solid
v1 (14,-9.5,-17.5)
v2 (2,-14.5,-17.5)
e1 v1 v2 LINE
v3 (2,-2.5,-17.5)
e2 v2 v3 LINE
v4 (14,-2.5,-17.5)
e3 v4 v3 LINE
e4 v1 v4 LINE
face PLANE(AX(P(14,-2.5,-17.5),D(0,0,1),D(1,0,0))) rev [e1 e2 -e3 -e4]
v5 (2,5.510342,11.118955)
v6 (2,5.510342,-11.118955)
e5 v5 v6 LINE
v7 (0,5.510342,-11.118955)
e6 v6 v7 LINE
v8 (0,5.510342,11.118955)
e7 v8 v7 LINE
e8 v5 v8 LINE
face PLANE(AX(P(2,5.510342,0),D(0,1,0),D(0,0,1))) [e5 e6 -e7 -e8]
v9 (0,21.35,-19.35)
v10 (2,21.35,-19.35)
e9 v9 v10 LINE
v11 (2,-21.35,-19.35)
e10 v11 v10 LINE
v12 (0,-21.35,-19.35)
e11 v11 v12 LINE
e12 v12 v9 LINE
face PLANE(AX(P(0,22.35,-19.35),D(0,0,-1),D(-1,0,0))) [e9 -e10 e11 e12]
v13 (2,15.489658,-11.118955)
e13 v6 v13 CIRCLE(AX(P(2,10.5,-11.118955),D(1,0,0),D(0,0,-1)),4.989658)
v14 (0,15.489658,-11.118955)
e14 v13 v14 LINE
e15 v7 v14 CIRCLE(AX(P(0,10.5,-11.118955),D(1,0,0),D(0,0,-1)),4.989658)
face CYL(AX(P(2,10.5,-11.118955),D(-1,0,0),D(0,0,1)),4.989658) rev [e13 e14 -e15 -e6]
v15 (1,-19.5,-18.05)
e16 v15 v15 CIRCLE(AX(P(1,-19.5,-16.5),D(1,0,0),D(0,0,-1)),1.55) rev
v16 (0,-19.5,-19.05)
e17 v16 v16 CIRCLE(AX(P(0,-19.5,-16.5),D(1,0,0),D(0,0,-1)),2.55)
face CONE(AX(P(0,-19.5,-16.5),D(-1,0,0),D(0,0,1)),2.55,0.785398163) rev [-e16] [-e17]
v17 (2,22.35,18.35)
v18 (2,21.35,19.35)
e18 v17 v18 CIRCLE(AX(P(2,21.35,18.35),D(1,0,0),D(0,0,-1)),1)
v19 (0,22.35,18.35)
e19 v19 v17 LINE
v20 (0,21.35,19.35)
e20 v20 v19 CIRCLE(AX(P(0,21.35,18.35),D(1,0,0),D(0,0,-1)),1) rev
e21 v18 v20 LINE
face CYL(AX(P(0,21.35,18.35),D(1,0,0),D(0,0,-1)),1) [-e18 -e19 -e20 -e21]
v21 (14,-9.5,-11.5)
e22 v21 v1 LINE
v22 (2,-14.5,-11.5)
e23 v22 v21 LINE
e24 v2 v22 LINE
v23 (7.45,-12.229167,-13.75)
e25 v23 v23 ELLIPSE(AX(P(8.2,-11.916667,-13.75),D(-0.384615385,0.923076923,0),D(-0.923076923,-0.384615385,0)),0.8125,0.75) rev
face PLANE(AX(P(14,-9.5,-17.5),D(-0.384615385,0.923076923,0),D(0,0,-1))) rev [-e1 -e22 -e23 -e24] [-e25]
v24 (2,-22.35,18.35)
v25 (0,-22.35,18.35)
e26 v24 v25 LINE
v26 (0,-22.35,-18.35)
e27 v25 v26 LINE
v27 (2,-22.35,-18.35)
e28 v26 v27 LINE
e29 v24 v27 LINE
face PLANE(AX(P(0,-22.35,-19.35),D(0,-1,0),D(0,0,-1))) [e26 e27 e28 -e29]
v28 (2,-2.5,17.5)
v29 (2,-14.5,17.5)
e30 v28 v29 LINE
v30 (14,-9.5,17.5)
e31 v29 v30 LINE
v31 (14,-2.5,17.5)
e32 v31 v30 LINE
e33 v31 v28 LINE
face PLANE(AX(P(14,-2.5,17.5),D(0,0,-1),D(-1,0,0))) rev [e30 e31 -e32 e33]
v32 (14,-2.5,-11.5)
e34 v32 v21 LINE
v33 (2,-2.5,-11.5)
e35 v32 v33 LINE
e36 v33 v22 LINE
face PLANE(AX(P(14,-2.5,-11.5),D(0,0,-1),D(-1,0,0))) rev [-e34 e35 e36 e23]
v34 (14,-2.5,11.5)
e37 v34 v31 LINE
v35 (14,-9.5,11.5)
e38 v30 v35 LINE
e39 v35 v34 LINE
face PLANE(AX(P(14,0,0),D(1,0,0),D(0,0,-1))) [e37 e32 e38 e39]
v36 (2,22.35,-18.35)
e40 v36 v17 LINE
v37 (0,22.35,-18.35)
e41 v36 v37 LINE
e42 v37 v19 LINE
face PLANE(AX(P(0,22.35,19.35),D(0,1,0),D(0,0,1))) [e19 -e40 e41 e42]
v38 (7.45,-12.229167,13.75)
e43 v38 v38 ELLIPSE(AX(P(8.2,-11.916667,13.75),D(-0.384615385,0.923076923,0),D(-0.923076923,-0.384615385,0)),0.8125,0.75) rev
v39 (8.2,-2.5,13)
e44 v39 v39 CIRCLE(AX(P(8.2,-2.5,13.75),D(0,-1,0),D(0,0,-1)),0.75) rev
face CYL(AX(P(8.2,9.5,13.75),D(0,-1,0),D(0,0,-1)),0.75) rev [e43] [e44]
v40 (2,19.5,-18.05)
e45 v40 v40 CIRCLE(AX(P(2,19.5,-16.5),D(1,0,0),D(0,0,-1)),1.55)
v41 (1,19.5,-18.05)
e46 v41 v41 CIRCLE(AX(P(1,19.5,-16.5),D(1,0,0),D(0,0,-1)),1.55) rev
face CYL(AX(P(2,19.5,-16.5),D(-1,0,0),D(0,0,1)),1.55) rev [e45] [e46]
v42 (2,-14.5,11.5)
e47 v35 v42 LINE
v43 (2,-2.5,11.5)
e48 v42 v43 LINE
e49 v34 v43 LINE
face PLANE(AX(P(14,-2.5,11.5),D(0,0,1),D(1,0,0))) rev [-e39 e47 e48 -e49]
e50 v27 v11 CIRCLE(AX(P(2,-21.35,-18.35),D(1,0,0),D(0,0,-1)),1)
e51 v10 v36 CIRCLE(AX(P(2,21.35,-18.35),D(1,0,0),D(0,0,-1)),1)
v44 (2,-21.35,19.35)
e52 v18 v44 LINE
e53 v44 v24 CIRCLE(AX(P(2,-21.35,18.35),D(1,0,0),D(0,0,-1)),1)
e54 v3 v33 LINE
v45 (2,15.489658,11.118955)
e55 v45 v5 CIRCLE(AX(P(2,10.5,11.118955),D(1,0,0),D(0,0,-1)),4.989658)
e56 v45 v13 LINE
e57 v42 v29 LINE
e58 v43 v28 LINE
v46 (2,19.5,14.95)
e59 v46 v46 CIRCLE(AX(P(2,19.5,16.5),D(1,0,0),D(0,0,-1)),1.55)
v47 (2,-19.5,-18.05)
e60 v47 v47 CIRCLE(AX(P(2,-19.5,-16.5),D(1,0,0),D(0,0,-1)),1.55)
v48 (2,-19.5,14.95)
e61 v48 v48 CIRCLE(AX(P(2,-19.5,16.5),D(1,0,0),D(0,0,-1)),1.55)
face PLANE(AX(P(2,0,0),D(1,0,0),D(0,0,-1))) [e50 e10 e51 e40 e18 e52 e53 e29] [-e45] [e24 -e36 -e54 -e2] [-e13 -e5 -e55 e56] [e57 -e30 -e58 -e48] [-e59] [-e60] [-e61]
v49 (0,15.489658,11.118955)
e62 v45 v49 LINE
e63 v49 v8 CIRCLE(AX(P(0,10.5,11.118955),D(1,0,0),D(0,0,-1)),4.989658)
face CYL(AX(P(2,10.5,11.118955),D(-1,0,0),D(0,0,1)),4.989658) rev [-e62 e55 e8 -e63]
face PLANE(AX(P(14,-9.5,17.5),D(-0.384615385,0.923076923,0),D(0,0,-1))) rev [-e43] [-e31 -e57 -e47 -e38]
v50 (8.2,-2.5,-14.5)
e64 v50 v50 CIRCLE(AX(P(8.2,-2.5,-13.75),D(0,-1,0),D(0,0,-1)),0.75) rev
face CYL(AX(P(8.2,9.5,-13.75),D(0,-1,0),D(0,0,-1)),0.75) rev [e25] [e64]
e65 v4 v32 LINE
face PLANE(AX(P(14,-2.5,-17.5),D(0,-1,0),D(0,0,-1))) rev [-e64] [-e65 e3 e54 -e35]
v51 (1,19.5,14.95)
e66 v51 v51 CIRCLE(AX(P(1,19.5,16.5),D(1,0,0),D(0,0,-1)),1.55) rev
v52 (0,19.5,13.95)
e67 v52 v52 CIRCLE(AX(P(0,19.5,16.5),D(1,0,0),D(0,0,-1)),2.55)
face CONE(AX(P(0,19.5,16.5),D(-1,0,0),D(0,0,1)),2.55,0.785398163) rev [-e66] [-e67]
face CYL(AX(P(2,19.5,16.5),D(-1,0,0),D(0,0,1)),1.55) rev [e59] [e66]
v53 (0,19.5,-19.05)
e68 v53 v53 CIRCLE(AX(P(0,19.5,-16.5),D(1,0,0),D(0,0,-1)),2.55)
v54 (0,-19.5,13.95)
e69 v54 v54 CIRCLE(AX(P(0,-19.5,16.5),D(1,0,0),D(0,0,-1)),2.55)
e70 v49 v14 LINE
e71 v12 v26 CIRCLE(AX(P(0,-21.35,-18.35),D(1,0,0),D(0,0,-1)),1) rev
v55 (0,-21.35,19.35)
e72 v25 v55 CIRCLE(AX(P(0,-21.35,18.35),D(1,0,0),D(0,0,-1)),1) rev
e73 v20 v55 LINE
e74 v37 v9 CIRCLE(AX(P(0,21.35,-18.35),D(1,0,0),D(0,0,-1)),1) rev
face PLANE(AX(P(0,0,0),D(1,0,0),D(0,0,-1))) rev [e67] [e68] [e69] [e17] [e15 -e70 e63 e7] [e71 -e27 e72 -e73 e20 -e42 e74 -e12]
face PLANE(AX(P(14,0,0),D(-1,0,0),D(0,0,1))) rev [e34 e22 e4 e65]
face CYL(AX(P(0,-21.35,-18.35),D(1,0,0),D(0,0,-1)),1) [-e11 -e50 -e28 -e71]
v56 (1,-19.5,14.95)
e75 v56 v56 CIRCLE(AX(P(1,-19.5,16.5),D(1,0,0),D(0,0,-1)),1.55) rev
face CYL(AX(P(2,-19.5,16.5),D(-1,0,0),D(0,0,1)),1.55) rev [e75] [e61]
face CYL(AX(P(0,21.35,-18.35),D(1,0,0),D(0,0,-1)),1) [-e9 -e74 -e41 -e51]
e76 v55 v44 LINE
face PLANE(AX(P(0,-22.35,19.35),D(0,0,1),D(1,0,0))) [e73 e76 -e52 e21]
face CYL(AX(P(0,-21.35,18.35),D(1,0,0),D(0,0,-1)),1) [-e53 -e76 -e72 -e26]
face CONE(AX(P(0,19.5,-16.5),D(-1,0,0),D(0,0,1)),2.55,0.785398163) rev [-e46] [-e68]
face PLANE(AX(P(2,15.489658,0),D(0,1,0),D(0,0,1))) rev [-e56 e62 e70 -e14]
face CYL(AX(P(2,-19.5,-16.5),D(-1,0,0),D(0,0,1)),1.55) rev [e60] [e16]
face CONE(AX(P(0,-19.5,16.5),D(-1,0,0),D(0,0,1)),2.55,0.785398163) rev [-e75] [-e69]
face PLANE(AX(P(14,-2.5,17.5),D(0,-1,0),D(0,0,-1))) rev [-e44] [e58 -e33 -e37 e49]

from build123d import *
from OCP.BRepFilletAPI import BRepFilletAPI_MakeChamfer

# Parameters (mm, degrees)
SKETCH1_W               = 39
SKETCH1_H               = 45
SKETCH1_R               = 1.55
BOSS_EXTRUDE1_DEPTH     = 2
SKETCH2_W               = 6
SKETCH2_H               = 7
BOSS_EXTRUDE2_DEPTH     = 12
CHAMFER1_SIZE           = 5
CHAMFER1_SIZE_2         = 12
CUT_EXTRUDE1_DEPTH      = 12
CUT_EXTRUDE1_DEPTH_BACK = 22
SKETCH3_R               = 0.75
CUT_EXTRUDE2_DEPTH      = 33.101401839
CUT_EXTRUDE2_DEPTH_BACK = 33.101401839
SKETCH4_W               = 39
SKETCH4_H               = 45
SKETCH4_W_2             = 38.7
SKETCH4_H_2             = 44.7
FILLET1_R               = 1
CHAMFER2_SIZE           = 1


with BuildPart() as part:
    # Sketch1 → Boss-Extrude1 (new body)
    with BuildSketch(Plane(origin=(0, 0, 0), x_dir=(0, 0, -1), z_dir=(1, 0, 0))):
        Rectangle(SKETCH1_W, SKETCH1_H)
        with Locations((-16.5, 19.5)):
            Circle(SKETCH1_R, mode=Mode.SUBTRACT)
        with Locations((16.5, 19.5)):
            Circle(SKETCH1_R, mode=Mode.SUBTRACT)
        with Locations((16.5, -19.5)):
            Circle(SKETCH1_R, mode=Mode.SUBTRACT)
        with Locations((-16.5, -19.5)):
            Circle(SKETCH1_R, mode=Mode.SUBTRACT)
        with BuildLine():
            Line((-11.118955155, 15.489657916), (11.118955155, 15.489657916))
            ThreePointArc((11.118955155, 15.489657916), (16.108613071, 10.5), (11.118955155, 5.510342084))
            Line((11.118955155, 5.510342084), (-11.118955155, 5.510342084))
            ThreePointArc((-11.118955155, 5.510342084), (-16.108613071, 10.5), (-11.118955155, 15.489657916))
        make_face(mode=Mode.SUBTRACT)
    extrude(amount=BOSS_EXTRUDE1_DEPTH)

    # Sketch2 → Boss-Extrude2 (add)
    with BuildSketch(Plane(origin=(2, 0, 0), x_dir=(0, 0, -1), z_dir=(1, 0, 0))):
        with Locations((14.5, -6)):
            Rectangle(SKETCH2_W, SKETCH2_H)
        with Locations((-14.5, -6)):
            Rectangle(SKETCH2_W, SKETCH2_H)
    extrude(amount=BOSS_EXTRUDE2_DEPTH)

    # Chamfer1
    chamfer1_edges_1 = [part.edges().sort_by_distance(p)[0] for p in [
        (2, -9.5, -14.5),
    ]]
    chamfer1_side_1 = [part.faces().sort_by_distance(p)[0] for p in [
        (2, -9.6, -14.5),
    ]]
    chamfer1_edges_2 = [part.edges().sort_by_distance(p)[0] for p in [
        (2, -9.5, 14.5),
    ]]
    chamfer1_side_2 = [part.faces().sort_by_distance(p)[0] for p in [
        (2, -9.6, 14.5),
    ]]
    chamfer1 = BRepFilletAPI_MakeChamfer(part.part.solid().wrapped)
    for e in chamfer1_edges_1:
        chamfer1.Add(CHAMFER1_SIZE - 0.0001, CHAMFER1_SIZE_2 - 0.0001, e.wrapped, chamfer1_side_1[0].wrapped)
    for e in chamfer1_edges_2:
        chamfer1.Add(CHAMFER1_SIZE - 0.0001, CHAMFER1_SIZE_2 - 0.0001, e.wrapped, chamfer1_side_2[0].wrapped)
    add(Compound.cast(chamfer1.Shape()), mode=Mode.REPLACE)  # a hair under: the kernel refuses the full size

    # Sketch3 → Cut-Extrude1 (cut, two sides: drawn at the far end of the back side and taken through both)
    with BuildSketch(Plane(origin=(0, -2.5, 0), x_dir=(1, 0, 0), z_dir=(0, 1, 0)).offset(-CUT_EXTRUDE1_DEPTH_BACK)):
        with Locations(Location((8.2, -13.75, 0), (0, 0, 90))):
            Circle(SKETCH3_R)
        with Locations(Location((8.2, 13.75, 0), (0, 0, 90))):
            Circle(SKETCH3_R)
    extrude(amount=CUT_EXTRUDE1_DEPTH + CUT_EXTRUDE1_DEPTH_BACK, mode=Mode.SUBTRACT)

    # Sketch4 → Cut-Extrude2 (cut, two sides: drawn at the far end of the back side and taken through both)
    with BuildSketch(Plane(origin=(2, 0, 0), x_dir=(0, 0, -1), z_dir=(1, 0, 0)).offset(-CUT_EXTRUDE2_DEPTH_BACK)):
        Rectangle(SKETCH4_W, SKETCH4_H)
        Rectangle(SKETCH4_W_2, SKETCH4_H_2, mode=Mode.SUBTRACT)
    extrude(amount=CUT_EXTRUDE2_DEPTH + CUT_EXTRUDE2_DEPTH_BACK, mode=Mode.SUBTRACT)

    # Fillet1
    fillet1_edges = [part.edges().sort_by_distance(p)[0] for p in [
        (1, 22.35, -19.35),
        (1, -22.35, -19.35),
        (1, -22.35, 19.35),
        (1, 22.35, 19.35),
    ]]
    fillet(fillet1_edges, radius=FILLET1_R)

    # Chamfer2
    chamfer2_edges = [part.edges().sort_by_distance(p)[0] for p in [
        (0, 19.5, 18.05),
        (0, 19.5, -14.95),
        (0, -19.5, -14.95),
        (0, -19.5, 18.05),
    ]]
    chamfer(chamfer2_edges, length=CHAMFER2_SIZE)


solid = part.part
